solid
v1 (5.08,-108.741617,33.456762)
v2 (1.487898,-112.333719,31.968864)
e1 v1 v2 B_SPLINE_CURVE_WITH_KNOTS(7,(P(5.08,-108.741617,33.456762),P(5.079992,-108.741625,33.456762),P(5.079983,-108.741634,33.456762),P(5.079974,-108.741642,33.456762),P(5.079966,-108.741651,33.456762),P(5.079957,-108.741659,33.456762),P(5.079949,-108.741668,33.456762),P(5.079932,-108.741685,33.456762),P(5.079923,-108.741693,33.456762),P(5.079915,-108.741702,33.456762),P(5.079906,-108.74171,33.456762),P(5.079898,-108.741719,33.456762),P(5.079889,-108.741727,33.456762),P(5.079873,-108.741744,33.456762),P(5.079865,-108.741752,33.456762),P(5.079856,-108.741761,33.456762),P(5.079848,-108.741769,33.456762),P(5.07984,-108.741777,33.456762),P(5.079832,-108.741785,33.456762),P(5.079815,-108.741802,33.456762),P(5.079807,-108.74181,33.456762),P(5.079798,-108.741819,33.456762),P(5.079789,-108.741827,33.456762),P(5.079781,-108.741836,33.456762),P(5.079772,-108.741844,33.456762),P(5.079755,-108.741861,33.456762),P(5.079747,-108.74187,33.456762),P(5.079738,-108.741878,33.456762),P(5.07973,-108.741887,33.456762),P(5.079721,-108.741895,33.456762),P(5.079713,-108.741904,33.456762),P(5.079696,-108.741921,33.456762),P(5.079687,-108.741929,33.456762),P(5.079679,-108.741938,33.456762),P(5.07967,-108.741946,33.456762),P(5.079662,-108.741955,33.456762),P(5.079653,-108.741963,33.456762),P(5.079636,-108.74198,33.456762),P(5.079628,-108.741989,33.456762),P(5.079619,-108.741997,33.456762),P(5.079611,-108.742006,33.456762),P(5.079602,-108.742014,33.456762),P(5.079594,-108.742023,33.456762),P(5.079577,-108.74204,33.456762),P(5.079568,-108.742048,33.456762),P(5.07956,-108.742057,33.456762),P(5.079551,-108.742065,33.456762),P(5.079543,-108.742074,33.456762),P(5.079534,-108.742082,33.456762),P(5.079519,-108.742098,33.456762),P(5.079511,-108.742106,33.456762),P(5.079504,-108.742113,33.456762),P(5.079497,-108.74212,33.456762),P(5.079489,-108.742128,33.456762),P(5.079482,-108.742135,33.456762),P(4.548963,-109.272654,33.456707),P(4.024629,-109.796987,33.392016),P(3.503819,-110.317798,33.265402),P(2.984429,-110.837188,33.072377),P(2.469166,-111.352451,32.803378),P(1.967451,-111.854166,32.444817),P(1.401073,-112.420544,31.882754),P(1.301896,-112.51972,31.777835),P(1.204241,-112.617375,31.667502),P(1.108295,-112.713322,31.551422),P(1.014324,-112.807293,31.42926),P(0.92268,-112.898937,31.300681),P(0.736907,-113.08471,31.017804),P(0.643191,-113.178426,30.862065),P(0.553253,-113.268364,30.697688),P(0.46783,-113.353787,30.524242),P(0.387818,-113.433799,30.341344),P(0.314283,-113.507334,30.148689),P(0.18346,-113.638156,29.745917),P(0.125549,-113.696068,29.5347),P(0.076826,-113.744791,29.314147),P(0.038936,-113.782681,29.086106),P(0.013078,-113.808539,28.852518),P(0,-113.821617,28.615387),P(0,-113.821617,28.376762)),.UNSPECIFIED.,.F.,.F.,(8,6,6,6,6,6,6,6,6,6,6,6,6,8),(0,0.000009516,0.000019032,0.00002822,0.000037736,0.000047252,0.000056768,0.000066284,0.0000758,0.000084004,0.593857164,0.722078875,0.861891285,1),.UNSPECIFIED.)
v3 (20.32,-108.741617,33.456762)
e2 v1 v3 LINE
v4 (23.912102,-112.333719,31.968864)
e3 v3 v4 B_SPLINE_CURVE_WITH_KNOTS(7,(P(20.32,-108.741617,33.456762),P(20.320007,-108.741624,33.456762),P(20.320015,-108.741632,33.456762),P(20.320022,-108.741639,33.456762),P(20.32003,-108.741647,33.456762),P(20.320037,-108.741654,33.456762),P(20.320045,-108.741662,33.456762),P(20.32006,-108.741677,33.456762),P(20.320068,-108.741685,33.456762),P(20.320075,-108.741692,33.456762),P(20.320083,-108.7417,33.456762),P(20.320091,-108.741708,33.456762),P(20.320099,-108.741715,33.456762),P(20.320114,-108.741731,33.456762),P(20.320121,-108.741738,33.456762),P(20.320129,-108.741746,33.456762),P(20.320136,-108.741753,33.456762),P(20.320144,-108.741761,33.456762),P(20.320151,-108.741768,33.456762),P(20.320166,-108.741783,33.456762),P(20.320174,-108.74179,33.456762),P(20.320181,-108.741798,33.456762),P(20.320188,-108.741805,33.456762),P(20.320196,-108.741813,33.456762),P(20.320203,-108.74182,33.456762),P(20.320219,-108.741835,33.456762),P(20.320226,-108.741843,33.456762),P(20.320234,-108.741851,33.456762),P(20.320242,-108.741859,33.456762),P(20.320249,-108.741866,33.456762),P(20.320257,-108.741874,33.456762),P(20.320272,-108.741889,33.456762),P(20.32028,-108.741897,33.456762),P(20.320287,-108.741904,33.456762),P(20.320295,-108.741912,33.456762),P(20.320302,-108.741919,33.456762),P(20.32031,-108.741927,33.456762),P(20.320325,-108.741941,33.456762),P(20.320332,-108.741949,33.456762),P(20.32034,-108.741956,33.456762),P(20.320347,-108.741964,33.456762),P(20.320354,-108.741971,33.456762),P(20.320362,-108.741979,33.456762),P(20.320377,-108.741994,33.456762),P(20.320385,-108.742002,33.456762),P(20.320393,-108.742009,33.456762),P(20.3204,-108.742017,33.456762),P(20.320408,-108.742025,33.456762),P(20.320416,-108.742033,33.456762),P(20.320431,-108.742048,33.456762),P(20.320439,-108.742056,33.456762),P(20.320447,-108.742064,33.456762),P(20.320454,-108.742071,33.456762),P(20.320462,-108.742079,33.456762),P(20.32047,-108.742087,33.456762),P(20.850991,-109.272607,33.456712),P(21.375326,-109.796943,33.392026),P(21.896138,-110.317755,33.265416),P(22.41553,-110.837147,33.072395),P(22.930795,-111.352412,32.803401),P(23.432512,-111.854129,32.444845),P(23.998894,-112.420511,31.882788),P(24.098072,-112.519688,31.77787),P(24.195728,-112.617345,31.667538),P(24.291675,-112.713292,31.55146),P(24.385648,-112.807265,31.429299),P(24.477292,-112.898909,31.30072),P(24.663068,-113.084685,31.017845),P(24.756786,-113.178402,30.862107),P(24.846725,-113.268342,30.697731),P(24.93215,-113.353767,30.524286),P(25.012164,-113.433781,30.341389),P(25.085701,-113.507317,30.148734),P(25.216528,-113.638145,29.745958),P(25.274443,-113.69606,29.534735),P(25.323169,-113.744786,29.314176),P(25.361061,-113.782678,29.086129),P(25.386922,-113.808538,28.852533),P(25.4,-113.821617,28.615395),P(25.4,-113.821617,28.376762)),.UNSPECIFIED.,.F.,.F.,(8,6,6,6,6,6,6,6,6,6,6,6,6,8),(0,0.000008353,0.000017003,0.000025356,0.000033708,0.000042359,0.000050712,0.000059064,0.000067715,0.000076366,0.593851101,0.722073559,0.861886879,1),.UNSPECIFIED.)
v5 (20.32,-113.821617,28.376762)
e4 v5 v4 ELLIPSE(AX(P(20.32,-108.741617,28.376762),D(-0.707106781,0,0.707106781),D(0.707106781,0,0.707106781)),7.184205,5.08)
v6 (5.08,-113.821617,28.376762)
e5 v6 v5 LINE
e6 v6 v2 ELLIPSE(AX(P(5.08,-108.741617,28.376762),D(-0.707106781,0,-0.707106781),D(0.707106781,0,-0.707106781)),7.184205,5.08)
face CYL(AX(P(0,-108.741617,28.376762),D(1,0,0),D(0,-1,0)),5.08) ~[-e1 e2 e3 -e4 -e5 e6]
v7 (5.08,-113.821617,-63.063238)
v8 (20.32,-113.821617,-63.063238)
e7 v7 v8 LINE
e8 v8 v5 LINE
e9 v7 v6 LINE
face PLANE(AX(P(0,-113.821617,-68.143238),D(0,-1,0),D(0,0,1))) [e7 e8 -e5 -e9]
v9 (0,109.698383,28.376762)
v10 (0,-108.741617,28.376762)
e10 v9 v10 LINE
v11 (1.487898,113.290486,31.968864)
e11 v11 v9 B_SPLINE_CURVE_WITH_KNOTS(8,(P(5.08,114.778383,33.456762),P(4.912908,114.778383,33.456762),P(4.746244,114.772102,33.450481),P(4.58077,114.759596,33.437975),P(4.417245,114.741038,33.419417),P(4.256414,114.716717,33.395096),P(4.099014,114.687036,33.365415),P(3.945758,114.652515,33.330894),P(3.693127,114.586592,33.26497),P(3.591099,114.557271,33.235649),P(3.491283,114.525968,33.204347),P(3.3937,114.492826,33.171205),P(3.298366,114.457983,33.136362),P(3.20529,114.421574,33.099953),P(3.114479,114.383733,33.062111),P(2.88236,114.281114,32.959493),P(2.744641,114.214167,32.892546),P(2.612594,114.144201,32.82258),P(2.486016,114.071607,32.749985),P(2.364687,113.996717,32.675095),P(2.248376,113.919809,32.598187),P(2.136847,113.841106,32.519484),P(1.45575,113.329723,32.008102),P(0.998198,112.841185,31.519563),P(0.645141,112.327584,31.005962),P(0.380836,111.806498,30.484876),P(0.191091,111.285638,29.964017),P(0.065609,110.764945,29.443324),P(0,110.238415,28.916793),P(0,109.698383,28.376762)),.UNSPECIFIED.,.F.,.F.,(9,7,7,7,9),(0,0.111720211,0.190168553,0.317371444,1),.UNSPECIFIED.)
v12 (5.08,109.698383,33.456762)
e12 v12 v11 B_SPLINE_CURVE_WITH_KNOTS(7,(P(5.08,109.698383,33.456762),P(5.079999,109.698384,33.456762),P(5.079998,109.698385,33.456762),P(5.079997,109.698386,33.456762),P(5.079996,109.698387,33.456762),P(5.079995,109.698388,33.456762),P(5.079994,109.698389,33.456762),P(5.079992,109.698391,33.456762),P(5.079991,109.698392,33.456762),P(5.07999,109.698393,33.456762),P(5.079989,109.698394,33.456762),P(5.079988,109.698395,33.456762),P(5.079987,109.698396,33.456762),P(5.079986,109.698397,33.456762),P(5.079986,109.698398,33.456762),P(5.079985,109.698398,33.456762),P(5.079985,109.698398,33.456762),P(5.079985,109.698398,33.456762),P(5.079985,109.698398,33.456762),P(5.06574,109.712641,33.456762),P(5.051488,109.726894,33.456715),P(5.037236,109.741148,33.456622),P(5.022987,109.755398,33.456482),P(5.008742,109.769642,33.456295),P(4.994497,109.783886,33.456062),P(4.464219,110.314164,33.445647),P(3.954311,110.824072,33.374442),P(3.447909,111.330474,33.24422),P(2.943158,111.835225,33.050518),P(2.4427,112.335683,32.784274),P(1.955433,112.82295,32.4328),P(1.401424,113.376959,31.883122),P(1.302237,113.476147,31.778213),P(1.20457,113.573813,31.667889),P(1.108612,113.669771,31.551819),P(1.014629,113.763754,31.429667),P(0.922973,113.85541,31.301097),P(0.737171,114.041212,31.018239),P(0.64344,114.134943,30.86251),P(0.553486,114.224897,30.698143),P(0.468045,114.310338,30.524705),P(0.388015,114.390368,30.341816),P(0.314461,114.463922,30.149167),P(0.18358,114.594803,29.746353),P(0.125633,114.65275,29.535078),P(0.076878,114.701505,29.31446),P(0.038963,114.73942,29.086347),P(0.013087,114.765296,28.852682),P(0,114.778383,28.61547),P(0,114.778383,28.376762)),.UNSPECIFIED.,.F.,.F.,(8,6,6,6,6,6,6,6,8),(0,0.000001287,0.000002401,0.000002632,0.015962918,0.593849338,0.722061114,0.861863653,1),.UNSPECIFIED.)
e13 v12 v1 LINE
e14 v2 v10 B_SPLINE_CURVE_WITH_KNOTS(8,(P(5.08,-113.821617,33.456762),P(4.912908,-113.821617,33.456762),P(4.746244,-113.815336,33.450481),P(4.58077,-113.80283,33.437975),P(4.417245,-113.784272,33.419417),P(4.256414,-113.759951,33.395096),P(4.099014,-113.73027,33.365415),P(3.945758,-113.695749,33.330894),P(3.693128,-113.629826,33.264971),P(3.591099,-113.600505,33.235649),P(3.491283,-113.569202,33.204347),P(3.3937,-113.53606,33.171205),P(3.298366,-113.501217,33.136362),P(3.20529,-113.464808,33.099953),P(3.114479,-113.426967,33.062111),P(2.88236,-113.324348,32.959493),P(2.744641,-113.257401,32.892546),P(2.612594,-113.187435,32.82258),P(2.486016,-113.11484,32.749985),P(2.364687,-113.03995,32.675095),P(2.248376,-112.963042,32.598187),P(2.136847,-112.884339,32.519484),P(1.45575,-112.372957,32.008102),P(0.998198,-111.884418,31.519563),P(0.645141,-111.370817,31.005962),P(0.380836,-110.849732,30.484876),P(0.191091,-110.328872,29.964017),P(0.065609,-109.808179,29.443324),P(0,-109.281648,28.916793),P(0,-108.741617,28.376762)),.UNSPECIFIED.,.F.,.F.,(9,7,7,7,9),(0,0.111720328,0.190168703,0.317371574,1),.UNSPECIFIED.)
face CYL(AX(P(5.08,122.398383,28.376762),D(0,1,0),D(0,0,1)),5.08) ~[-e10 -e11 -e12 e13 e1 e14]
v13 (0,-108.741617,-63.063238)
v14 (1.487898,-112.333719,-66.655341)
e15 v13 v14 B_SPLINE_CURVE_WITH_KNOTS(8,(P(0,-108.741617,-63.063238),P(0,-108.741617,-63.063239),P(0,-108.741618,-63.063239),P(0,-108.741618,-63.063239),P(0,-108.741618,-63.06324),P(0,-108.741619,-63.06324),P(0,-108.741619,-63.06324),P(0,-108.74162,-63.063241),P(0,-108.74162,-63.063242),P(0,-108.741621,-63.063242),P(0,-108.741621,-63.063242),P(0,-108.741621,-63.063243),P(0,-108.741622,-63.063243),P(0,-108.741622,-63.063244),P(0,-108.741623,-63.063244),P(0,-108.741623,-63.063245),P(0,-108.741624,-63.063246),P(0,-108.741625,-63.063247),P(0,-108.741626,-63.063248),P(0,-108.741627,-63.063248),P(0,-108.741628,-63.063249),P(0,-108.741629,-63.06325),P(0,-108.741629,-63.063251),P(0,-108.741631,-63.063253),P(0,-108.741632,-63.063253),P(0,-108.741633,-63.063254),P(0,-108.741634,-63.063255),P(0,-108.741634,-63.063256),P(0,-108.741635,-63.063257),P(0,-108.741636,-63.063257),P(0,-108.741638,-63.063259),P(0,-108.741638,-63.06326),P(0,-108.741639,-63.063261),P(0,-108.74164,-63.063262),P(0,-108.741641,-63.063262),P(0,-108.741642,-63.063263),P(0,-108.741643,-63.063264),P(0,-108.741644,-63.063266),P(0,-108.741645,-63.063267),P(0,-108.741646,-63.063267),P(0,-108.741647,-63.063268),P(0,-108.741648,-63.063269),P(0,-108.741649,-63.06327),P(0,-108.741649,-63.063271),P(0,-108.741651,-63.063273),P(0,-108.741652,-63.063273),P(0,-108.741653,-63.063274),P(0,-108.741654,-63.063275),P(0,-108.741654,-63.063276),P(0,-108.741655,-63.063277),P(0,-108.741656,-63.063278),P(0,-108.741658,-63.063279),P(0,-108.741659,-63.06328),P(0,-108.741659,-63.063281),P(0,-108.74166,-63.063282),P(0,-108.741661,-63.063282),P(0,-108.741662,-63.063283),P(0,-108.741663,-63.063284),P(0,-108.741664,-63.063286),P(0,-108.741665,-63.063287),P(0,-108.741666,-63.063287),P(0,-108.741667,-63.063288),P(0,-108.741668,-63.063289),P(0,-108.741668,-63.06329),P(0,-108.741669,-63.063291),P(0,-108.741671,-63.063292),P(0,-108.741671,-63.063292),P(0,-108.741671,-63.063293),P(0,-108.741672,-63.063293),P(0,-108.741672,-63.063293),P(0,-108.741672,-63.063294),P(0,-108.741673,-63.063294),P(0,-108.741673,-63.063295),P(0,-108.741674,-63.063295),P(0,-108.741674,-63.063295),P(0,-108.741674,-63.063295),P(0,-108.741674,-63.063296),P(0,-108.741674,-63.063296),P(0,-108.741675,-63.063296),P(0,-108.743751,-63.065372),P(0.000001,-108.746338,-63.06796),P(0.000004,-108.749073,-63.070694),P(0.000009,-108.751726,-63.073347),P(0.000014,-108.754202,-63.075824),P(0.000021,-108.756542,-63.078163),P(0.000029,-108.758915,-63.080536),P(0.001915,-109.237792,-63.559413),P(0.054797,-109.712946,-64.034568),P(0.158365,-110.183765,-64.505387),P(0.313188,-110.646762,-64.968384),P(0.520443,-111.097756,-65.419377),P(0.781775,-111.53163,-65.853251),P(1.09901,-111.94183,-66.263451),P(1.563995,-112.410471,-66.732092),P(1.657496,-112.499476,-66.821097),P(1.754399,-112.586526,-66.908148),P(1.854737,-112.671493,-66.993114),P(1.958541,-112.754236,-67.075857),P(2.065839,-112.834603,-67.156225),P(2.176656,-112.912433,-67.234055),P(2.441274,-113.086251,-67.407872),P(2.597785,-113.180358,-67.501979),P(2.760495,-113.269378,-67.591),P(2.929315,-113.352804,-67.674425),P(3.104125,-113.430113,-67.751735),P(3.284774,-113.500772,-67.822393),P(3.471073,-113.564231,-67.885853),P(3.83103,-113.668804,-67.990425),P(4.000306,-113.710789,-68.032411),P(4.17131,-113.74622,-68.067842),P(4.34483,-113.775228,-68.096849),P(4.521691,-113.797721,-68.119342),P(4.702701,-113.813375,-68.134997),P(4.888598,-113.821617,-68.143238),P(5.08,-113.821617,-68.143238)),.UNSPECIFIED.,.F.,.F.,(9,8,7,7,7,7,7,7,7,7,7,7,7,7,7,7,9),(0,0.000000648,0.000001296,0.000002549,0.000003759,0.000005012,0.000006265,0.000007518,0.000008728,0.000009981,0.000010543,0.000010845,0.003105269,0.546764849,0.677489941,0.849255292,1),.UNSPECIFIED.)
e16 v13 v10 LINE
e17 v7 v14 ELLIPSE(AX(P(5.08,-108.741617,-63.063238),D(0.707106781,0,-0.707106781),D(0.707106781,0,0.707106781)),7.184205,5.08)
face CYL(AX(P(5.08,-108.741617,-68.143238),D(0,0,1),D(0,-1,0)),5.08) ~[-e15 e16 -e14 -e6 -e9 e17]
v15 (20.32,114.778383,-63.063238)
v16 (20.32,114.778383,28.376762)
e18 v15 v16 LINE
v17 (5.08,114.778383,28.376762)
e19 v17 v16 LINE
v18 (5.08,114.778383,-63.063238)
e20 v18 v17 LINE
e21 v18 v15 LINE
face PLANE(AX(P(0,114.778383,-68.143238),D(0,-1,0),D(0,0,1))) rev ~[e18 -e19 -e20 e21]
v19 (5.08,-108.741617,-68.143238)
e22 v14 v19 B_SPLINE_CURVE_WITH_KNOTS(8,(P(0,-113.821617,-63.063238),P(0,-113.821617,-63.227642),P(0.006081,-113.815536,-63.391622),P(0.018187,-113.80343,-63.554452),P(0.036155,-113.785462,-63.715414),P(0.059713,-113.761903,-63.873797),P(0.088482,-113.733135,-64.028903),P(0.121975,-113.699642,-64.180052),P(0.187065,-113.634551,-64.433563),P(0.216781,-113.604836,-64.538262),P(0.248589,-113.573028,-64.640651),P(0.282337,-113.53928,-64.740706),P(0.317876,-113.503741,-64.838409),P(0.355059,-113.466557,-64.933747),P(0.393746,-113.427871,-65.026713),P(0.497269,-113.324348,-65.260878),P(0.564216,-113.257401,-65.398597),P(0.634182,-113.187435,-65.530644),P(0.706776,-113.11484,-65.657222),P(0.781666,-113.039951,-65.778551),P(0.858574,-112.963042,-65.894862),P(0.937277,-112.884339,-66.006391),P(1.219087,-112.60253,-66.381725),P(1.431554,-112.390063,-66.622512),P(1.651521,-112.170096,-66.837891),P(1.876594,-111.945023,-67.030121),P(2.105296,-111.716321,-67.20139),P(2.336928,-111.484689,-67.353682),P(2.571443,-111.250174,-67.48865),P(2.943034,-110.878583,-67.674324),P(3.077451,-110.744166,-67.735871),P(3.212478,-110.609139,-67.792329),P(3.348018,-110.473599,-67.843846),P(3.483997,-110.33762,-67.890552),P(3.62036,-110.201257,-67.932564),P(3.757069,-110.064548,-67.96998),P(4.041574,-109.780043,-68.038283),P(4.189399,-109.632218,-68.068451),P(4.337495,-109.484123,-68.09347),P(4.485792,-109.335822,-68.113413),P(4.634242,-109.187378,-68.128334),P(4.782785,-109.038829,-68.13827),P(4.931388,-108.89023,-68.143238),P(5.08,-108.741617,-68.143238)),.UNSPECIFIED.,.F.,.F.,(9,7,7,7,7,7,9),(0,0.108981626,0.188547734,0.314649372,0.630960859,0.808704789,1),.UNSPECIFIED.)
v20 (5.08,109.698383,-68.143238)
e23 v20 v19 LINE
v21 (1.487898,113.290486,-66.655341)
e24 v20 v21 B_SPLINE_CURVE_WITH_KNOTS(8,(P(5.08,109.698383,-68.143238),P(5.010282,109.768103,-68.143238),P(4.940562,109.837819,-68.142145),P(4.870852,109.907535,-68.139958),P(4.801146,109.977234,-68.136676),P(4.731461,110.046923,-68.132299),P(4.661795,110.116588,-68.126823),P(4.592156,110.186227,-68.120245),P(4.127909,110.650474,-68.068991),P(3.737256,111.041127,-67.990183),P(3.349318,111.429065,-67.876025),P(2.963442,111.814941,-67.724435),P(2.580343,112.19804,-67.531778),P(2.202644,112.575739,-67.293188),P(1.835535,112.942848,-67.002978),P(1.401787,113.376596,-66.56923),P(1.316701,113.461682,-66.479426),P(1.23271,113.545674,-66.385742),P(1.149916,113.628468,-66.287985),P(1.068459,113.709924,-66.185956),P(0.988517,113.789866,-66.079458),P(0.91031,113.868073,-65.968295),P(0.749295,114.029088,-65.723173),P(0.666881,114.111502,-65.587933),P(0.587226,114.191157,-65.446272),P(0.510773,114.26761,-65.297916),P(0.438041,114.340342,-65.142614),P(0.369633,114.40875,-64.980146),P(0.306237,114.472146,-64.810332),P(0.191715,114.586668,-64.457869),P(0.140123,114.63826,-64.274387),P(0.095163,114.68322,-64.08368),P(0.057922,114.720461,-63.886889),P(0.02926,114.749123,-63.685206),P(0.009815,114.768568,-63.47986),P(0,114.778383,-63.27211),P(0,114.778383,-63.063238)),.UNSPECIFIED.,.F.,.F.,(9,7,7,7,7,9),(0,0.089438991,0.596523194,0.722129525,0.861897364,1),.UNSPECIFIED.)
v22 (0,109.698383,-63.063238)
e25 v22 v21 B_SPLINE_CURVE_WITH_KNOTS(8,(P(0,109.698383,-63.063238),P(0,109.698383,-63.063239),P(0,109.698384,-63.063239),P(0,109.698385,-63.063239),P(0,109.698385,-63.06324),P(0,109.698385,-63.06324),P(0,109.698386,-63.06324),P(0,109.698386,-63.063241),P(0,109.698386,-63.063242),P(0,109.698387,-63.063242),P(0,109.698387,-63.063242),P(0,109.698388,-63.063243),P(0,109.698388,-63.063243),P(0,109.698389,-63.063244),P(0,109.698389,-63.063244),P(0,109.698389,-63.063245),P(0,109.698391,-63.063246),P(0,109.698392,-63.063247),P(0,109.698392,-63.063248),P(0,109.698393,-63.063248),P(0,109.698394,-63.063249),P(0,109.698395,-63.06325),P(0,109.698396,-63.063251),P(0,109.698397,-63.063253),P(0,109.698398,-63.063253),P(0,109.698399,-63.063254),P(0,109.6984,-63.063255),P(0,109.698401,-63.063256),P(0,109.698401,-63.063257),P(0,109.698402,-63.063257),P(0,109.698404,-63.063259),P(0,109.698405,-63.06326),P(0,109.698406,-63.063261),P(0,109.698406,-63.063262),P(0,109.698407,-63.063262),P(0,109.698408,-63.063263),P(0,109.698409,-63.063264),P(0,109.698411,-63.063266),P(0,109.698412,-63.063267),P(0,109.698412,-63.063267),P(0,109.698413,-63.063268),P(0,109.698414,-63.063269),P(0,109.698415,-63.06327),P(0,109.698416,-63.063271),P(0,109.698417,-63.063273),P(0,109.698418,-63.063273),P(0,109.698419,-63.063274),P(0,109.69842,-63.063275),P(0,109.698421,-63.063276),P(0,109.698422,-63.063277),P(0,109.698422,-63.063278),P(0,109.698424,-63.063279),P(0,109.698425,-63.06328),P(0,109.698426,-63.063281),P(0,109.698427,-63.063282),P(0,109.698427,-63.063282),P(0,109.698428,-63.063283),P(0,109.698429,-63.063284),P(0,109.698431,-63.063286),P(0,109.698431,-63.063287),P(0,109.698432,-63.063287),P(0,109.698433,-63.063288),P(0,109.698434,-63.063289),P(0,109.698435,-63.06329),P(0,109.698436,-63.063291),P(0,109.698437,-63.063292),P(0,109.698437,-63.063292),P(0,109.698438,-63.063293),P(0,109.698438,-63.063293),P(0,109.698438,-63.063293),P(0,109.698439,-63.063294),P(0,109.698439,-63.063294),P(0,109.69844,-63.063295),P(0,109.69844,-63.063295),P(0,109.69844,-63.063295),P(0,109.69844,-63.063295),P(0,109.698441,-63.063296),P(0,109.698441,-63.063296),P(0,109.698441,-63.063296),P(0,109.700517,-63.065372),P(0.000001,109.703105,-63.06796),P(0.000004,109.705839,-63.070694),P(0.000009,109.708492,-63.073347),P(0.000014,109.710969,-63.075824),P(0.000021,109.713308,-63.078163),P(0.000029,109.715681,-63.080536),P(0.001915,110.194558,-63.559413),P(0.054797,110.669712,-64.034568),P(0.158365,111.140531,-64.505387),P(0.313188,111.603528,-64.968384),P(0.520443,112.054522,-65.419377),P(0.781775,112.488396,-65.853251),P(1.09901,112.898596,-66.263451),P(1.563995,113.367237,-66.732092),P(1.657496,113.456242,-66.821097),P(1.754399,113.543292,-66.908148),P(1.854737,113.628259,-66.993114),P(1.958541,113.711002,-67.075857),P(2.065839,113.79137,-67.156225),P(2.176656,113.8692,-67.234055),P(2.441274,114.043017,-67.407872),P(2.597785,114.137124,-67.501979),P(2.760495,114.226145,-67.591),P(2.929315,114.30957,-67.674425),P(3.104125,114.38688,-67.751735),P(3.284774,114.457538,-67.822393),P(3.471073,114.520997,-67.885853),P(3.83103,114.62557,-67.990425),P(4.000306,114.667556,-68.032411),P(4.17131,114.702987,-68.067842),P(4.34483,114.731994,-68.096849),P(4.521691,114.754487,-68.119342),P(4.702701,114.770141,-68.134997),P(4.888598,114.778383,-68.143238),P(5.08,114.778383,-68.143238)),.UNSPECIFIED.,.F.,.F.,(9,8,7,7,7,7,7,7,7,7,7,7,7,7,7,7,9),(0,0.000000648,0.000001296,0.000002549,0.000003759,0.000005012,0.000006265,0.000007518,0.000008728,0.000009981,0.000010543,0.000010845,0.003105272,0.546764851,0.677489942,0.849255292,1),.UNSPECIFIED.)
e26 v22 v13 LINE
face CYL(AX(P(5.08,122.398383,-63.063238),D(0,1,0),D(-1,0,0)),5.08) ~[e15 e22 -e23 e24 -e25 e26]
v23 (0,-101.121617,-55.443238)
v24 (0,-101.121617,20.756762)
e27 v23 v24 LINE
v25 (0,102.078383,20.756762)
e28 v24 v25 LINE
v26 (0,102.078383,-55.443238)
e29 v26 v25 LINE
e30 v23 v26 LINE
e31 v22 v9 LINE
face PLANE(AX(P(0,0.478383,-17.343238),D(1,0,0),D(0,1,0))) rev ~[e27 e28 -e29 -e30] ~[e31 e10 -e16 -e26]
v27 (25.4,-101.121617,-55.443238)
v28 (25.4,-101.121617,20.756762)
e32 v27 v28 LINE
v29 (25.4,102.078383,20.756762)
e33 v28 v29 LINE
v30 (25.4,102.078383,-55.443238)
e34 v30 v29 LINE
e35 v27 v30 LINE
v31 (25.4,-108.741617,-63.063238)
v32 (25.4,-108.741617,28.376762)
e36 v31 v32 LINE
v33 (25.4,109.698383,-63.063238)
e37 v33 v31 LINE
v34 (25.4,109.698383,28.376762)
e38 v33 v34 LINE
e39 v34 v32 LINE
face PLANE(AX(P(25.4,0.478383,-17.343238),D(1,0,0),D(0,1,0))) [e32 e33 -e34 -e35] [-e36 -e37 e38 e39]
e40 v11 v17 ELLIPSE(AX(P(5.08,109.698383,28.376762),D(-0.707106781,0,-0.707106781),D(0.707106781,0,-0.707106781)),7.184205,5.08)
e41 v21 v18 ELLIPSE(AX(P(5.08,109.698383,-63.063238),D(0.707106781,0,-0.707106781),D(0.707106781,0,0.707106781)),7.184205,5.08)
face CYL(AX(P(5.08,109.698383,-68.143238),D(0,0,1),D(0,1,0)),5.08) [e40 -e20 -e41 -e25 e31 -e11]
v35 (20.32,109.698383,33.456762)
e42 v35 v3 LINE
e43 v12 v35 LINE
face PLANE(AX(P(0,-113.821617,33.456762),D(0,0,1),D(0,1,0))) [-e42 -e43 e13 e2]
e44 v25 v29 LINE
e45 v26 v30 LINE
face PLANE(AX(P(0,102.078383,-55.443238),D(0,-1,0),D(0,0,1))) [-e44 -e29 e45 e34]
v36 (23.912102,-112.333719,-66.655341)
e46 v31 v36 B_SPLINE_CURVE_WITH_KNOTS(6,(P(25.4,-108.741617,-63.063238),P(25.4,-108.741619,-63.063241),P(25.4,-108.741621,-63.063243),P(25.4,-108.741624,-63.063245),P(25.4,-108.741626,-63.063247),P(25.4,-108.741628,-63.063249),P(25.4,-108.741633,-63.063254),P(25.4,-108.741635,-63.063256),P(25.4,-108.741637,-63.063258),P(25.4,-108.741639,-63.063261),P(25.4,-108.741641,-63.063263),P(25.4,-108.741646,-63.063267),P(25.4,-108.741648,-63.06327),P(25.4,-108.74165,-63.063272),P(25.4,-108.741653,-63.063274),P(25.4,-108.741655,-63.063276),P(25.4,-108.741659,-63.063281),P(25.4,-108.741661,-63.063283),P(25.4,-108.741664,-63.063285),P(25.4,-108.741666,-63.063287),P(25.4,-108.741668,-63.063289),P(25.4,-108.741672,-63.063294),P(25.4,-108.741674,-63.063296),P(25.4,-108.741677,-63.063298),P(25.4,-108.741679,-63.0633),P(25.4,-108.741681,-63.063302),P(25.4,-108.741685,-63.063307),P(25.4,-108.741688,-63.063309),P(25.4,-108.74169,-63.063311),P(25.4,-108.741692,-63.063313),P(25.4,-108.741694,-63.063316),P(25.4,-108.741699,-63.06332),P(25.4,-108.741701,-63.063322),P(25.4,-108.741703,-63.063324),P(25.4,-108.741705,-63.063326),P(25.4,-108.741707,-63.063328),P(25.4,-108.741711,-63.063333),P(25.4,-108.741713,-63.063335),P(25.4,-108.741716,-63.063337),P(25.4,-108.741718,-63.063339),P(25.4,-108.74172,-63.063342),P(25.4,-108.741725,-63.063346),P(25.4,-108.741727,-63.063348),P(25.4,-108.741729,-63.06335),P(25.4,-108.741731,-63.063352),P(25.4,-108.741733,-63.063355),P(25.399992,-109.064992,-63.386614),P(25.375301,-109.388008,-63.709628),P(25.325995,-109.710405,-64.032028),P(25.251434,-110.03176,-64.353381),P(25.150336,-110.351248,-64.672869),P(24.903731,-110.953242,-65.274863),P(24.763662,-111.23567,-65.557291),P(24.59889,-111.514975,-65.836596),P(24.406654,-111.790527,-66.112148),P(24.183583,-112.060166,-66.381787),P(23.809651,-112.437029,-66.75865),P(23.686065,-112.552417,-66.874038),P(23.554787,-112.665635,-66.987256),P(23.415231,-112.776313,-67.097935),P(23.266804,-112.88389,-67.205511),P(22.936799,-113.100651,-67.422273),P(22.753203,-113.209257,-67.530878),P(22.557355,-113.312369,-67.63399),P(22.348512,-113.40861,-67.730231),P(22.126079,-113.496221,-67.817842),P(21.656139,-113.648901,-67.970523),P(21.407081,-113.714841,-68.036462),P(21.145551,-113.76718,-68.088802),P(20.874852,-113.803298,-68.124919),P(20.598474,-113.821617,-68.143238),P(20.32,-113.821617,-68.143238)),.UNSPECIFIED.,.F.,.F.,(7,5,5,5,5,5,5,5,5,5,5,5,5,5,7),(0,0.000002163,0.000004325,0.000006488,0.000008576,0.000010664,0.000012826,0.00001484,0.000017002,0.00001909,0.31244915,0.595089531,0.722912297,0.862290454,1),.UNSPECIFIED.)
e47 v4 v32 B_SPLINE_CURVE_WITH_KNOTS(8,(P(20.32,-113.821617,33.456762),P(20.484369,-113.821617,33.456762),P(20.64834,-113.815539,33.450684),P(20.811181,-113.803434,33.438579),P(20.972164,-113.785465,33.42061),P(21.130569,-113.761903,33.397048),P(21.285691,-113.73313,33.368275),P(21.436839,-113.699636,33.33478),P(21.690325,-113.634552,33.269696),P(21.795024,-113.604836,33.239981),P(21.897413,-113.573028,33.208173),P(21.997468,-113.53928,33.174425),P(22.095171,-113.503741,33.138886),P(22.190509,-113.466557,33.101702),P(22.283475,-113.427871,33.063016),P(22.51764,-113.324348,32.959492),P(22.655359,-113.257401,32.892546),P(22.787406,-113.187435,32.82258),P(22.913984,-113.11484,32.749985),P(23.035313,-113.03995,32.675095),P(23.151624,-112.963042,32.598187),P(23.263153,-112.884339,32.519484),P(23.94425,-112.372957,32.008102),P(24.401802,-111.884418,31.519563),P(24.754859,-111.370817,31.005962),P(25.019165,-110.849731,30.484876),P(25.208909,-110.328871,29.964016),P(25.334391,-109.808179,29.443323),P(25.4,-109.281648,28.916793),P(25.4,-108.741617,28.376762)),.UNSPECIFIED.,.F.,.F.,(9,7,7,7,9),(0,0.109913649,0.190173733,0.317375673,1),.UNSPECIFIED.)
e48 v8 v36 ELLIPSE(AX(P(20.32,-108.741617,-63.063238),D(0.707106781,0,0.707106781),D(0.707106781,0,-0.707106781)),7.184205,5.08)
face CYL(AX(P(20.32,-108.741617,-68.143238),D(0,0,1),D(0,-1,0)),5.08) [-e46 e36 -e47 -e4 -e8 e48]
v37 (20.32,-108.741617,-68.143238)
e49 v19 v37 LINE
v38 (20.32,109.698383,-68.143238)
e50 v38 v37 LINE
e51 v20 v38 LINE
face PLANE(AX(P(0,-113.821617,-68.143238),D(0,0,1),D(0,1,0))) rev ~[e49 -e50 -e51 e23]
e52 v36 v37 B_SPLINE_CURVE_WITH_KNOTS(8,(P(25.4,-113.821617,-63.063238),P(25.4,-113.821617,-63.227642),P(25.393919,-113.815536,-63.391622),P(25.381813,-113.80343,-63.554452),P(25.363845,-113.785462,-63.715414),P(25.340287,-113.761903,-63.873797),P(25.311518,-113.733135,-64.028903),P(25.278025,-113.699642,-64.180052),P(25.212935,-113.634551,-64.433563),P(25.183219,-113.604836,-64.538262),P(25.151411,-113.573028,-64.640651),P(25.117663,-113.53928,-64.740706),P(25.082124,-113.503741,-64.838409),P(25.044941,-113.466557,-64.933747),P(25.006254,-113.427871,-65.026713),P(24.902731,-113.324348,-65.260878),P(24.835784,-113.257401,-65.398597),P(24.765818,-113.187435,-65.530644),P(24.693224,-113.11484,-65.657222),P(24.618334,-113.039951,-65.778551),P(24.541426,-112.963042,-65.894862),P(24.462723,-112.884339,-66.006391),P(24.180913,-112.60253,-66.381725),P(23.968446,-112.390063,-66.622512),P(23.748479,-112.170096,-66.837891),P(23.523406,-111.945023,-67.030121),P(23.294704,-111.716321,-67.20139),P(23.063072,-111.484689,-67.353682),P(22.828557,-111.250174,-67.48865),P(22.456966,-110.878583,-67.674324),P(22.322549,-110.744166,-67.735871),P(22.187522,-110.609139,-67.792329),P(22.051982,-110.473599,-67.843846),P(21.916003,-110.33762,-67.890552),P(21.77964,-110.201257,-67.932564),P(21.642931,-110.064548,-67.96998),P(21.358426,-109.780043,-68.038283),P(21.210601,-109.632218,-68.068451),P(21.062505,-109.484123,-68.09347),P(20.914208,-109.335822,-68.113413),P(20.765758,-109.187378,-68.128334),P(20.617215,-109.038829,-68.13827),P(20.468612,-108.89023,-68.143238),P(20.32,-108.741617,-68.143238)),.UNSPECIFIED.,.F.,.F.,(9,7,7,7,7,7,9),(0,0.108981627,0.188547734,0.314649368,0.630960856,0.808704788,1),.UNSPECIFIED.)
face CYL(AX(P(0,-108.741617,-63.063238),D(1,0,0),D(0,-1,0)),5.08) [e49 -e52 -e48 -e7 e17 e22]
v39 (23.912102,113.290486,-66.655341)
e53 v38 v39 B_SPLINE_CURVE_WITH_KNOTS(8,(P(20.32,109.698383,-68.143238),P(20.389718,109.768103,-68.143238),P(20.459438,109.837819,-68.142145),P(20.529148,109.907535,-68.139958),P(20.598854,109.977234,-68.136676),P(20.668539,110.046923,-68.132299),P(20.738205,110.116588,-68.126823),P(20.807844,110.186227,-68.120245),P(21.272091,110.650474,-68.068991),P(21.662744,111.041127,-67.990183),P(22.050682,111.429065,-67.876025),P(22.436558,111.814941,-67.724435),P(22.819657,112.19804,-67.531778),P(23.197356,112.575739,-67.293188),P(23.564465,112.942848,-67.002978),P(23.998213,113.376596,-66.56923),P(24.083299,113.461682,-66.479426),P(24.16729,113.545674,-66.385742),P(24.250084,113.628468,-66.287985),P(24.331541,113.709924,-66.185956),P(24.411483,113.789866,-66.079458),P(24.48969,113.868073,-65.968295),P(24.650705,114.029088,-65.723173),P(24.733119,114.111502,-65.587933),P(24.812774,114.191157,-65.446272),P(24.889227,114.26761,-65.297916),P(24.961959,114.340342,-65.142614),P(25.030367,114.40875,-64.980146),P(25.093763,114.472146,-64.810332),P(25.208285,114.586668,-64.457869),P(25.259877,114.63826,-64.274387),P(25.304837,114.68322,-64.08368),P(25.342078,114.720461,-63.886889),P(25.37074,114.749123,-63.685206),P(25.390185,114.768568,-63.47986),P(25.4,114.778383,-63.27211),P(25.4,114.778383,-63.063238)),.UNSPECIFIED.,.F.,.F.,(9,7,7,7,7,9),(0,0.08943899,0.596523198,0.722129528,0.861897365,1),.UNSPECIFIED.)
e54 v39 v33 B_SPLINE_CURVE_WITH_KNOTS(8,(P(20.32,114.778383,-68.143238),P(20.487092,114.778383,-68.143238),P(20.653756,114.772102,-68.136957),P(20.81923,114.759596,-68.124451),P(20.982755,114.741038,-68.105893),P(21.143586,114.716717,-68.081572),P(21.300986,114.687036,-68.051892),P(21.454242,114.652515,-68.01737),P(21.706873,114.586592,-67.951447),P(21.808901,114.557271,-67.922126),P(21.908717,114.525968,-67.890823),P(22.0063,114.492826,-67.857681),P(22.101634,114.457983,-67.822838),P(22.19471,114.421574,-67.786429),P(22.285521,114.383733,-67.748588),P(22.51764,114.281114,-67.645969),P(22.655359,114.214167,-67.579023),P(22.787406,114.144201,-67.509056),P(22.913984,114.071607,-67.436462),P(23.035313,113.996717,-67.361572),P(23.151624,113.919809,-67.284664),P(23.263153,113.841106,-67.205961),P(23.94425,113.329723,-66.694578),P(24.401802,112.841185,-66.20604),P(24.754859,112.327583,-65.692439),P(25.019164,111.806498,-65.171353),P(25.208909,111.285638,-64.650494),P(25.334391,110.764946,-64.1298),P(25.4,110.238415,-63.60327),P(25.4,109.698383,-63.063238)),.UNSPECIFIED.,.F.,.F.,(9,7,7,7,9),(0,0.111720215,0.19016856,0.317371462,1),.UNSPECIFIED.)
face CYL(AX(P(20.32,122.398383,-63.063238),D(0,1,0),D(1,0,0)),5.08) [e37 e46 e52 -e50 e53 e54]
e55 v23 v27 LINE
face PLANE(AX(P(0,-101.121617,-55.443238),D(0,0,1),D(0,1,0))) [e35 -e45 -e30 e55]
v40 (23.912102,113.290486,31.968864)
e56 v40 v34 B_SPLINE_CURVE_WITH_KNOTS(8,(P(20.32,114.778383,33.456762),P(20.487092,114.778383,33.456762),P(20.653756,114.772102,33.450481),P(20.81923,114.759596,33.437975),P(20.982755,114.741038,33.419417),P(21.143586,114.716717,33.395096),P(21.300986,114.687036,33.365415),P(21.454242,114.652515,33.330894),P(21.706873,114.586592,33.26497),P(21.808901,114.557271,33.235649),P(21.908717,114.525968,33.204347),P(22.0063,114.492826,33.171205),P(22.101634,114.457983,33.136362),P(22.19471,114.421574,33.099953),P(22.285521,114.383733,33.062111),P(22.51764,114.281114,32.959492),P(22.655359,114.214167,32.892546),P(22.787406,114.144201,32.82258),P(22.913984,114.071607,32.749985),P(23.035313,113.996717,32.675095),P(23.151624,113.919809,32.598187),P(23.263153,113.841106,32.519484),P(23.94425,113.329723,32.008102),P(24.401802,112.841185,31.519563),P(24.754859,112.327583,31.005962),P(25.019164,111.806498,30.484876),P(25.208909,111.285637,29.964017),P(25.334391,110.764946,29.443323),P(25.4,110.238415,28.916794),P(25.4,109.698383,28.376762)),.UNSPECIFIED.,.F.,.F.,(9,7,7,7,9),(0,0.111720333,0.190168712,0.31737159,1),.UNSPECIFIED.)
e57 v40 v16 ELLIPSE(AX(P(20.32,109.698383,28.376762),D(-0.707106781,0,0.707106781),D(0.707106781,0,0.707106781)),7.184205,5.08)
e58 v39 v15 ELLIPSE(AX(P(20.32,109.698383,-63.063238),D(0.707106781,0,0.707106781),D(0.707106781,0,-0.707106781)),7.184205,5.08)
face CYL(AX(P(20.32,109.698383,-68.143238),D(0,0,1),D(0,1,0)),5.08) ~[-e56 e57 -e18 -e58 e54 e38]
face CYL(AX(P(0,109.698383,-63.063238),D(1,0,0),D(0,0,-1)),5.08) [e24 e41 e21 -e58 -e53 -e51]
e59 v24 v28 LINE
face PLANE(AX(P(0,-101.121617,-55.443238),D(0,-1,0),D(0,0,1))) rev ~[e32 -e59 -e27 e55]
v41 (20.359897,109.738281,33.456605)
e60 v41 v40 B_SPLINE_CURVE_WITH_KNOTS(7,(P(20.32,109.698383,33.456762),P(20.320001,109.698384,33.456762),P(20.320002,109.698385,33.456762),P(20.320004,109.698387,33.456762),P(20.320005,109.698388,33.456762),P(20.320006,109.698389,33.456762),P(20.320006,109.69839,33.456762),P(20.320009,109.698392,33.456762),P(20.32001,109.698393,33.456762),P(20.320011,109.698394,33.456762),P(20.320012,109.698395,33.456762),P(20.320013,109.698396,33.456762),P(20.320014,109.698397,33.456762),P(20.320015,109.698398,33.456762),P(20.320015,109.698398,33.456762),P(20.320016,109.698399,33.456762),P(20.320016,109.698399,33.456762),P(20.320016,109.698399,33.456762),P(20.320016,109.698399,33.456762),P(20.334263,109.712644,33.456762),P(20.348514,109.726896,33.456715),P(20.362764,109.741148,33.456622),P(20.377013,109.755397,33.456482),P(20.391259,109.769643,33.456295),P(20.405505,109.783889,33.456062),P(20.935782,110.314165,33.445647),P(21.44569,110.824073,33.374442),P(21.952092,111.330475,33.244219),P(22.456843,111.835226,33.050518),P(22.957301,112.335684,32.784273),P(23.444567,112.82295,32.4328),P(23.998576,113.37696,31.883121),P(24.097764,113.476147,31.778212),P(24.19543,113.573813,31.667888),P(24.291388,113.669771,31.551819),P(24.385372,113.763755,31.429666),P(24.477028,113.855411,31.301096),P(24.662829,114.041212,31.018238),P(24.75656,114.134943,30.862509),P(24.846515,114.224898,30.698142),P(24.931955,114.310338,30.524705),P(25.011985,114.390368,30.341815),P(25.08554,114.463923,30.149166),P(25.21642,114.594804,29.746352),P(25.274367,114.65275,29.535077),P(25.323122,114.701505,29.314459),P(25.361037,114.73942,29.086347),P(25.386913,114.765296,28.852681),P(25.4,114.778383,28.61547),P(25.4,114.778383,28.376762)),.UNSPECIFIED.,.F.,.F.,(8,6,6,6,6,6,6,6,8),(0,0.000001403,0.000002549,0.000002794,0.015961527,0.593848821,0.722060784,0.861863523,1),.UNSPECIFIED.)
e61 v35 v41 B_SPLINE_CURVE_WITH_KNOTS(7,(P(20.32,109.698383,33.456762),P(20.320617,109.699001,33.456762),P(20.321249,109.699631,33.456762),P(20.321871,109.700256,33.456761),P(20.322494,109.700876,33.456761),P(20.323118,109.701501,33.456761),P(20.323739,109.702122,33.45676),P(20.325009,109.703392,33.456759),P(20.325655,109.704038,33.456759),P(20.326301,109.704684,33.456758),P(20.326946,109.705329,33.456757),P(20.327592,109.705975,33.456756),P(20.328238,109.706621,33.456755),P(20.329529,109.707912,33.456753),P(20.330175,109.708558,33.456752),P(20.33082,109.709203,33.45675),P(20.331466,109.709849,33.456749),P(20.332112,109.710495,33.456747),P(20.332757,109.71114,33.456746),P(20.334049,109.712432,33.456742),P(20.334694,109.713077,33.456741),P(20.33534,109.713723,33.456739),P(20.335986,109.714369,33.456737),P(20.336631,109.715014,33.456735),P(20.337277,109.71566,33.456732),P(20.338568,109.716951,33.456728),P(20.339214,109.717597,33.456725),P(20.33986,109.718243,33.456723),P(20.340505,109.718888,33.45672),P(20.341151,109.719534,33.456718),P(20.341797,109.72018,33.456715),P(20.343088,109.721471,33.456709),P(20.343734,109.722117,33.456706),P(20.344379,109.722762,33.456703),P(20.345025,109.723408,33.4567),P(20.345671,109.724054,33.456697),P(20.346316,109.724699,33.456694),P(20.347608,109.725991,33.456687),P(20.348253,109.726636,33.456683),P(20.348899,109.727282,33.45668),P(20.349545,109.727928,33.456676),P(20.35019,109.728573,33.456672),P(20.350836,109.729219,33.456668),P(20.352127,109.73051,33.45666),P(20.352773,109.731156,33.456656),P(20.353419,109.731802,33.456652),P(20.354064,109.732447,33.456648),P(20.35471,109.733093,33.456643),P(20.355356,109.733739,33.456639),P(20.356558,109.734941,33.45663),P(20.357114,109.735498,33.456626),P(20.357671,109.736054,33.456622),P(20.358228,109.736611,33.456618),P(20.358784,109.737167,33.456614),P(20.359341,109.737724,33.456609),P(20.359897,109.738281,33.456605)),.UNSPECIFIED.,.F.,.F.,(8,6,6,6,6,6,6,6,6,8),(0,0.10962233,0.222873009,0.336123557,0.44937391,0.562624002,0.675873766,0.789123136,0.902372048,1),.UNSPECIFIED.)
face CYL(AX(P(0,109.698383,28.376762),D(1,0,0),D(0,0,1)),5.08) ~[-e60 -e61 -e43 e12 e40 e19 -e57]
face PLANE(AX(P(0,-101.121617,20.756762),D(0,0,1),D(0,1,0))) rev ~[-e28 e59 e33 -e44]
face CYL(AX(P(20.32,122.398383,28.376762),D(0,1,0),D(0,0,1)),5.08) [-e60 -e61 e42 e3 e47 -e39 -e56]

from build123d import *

# Parameters (mm, degrees)
F0_W        = 228.6
F0_H        = 101.6
F0_W_2      = 203.2
F0_H_2      = 76.2
F1_DEPTH    = 25.4
F2_R        = 5.08
F3_T1_DEPTH = 243.84
F4_T1_DEPTH = 243.84


# Not quite as in the source:
# - a fillet or chamfer that OpenCascade refuses, or shapes differently, is made with other operations: its cross-section is extruded or revolved along the edge and cut away or added


with BuildPart() as f1:
    # F0 (on Right) → F1 (new body)
    with BuildSketch(Plane.YZ):
        with Locations((0.4783831537, -17.3432382704)):
            Rectangle(F0_W, F0_H)
        with Locations((0.4783831537, -17.3432382704)):
            Rectangle(F0_W_2, F0_H_2, mode=Mode.SUBTRACT)
    extrude(amount=F1_DEPTH)

    # F2
    f2_edges = [f1.edges().sort_by_distance(p)[0] for p in [
        (12.7, -113.821617, 33.456762),
        (12.7, -113.821617, -68.143238),
        (0, -113.821617, -17.343238),
        (25.4, -113.821617, -17.343238),
        (12.7, 114.778383, -68.143238),
        (12.7, 114.778383, 33.456762),
        (0, 114.778383, -17.343238),
        (25.4, 114.778383, -17.343238),
    ]]
    fillet(f2_edges, radius=F2_R)

    # F3: fillet of radius 5.08 on 4 edges, made by hand

    # F3_s2 → F3_t1 (cut)
    with BuildSketch(Plane.XZ.offset(-122.3983831537)):
        with BuildLine():
            ThreePointArc((0, -63.0632382704), (1.4878975516, -66.6553407189), (5.08, -68.1432382704))
            Line((5.08, -68.1432382704), (0, -68.1432382704))
            Line((0, -68.1432382704), (0, -63.0632382704))
        make_face()
        with BuildLine():
            ThreePointArc((25.4, -63.0632382704), (23.9121024484, -66.6553407189), (20.32, -68.1432382704))
            Line((20.32, -68.1432382704), (25.4, -68.1432382704))
            Line((25.4, -68.1432382704), (25.4, -63.0632382704))
        make_face()
    extrude(amount=F3_T1_DEPTH, mode=Mode.SUBTRACT)

    # F4: fillet of radius 5.08 on 4 edges, made by hand

    # F4_s2 → F4_t1 (cut)
    with BuildSketch(Plane.XZ.offset(-122.3983831537)):
        with BuildLine():
            ThreePointArc((5.08, 33.4567617296), (1.4878975516, 31.968864178), (0, 28.3767617296))
            Line((0, 28.3767617296), (0, 33.4567617296))
            Line((0, 33.4567617296), (5.08, 33.4567617296))
        make_face()
        with BuildLine():
            ThreePointArc((20.32, 33.4567617296), (23.9121024484, 31.968864178), (25.4, 28.3767617296))
            Line((25.4, 28.3767617296), (25.4, 33.4567617296))
            Line((25.4, 33.4567617296), (20.32, 33.4567617296))
        make_face()
    extrude(amount=F4_T1_DEPTH, mode=Mode.SUBTRACT)


solid = f1.part
